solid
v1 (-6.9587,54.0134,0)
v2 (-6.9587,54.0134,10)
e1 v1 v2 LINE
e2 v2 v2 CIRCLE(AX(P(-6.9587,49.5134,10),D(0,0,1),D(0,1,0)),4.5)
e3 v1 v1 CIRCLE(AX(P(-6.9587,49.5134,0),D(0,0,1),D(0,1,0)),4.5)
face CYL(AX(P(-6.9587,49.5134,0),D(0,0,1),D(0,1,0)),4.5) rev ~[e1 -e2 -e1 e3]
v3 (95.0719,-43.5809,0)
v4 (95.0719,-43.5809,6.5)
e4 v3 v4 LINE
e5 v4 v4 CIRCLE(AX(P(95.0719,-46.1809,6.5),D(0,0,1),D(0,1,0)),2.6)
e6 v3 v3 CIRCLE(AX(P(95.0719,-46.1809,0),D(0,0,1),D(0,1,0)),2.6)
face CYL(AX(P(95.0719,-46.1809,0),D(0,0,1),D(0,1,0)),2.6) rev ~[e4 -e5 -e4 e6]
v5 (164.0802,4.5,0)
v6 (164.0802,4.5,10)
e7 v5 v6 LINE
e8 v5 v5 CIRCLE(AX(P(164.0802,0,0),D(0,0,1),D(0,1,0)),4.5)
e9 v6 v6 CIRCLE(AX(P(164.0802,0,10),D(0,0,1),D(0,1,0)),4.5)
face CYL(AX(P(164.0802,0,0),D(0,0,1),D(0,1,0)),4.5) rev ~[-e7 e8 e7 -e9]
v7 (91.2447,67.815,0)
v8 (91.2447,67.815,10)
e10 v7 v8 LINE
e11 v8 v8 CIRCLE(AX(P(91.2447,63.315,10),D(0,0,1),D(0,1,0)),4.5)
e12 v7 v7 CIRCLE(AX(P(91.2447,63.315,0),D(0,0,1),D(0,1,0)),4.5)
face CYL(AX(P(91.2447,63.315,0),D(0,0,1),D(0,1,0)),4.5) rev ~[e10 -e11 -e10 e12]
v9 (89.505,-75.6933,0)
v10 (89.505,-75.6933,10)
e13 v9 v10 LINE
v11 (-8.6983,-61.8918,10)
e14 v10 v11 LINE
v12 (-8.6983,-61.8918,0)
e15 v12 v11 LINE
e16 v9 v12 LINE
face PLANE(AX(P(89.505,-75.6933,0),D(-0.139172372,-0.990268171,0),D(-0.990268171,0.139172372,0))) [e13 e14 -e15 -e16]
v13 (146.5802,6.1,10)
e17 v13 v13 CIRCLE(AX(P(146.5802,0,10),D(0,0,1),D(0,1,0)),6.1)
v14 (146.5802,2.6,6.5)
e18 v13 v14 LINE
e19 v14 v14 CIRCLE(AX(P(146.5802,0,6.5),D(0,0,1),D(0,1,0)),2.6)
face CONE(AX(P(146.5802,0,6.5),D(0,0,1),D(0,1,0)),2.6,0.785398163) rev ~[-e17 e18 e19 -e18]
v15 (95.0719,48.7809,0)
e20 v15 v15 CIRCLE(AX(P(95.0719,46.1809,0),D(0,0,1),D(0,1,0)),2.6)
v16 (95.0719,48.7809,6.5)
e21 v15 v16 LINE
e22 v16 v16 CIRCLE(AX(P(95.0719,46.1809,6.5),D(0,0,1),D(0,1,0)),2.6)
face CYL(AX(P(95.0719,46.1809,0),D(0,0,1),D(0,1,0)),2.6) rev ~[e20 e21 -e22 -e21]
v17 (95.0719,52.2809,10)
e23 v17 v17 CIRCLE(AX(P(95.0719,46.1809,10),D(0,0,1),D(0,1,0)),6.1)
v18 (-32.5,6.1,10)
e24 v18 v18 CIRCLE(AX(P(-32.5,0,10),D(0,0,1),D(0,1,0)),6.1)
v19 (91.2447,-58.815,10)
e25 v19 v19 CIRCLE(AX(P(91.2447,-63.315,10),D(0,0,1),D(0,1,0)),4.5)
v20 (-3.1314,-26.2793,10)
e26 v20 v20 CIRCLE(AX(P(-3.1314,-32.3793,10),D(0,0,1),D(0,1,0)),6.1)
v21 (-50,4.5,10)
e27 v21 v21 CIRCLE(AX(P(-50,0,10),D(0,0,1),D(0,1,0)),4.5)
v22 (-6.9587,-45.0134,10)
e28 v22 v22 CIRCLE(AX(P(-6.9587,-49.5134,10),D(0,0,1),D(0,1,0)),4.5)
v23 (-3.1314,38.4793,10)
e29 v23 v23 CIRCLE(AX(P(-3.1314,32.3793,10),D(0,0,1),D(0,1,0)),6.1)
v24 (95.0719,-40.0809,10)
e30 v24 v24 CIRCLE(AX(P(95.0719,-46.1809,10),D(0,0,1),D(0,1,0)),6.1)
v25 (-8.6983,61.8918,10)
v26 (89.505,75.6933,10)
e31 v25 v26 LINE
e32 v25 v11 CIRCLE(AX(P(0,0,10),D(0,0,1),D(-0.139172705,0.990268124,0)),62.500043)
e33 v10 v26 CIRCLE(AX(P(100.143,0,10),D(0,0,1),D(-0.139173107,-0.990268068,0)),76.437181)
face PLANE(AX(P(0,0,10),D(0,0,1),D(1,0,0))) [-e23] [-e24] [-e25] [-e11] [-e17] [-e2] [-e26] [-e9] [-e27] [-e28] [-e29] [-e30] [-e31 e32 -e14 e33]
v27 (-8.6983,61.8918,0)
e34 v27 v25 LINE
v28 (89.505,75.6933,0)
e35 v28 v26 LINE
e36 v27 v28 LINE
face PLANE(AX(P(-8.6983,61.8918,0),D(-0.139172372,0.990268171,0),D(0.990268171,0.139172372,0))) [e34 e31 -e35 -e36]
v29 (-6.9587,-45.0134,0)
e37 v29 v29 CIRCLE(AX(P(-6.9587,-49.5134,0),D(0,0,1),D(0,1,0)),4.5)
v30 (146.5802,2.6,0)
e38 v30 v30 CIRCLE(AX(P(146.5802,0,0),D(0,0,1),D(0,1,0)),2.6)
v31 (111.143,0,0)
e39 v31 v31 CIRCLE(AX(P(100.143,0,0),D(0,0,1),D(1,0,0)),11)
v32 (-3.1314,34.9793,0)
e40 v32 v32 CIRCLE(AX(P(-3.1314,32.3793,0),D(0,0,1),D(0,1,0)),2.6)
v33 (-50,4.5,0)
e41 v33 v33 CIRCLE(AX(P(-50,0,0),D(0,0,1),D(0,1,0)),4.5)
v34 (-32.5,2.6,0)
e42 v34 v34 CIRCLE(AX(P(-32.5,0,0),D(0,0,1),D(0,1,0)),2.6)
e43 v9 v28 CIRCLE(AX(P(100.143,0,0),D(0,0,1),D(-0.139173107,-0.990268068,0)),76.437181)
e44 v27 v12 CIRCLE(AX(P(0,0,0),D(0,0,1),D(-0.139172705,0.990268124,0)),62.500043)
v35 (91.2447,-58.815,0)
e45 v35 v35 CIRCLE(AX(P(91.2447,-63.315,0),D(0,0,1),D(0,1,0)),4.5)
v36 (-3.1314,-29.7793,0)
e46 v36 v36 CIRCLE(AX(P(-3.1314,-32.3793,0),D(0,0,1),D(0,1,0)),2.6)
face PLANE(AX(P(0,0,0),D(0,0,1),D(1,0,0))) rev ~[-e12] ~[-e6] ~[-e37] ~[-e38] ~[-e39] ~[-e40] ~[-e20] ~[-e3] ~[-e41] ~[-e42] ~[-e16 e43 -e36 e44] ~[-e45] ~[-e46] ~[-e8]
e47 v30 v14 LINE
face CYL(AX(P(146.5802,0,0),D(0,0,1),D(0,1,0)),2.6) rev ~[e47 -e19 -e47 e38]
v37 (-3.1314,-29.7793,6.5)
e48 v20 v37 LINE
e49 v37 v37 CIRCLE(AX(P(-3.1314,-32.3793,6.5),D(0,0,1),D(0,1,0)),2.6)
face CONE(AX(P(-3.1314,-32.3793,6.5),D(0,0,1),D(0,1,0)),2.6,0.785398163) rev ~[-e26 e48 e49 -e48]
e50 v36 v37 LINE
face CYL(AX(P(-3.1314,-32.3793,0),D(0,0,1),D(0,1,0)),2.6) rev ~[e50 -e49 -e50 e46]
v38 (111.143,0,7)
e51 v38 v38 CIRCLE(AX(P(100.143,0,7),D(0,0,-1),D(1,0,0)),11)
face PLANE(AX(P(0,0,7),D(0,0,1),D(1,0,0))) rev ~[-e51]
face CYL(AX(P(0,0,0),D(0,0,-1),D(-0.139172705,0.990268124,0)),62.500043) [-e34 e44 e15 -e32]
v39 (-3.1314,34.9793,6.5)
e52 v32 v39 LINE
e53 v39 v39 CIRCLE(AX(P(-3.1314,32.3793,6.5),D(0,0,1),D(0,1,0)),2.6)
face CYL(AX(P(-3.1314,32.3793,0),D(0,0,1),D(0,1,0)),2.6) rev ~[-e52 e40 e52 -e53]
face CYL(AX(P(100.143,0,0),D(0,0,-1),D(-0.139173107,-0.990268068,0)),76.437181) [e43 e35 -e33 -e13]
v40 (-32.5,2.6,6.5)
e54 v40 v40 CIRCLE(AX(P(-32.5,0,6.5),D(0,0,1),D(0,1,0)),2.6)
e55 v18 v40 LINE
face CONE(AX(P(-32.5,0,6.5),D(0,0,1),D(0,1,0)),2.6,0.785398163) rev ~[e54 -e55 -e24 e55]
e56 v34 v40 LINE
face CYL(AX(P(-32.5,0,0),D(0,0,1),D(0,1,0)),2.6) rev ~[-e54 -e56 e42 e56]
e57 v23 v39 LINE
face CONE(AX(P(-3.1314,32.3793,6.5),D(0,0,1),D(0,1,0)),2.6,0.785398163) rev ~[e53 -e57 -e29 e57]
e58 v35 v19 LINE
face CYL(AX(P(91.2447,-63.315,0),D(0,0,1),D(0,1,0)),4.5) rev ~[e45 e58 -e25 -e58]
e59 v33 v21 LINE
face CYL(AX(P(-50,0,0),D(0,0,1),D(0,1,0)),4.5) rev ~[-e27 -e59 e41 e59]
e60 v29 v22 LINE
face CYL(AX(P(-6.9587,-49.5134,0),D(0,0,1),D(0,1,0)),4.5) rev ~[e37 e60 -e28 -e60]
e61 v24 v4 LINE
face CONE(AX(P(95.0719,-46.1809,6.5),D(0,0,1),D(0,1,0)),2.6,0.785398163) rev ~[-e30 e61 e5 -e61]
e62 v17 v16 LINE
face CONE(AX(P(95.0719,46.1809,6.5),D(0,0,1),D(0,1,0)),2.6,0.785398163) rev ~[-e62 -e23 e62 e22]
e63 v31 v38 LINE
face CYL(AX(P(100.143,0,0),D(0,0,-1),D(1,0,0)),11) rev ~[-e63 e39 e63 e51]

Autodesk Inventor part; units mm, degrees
ref_plane "YZ Plane" through (0, 0, 0) normal (1, 0, 0) x (0, 1, 0)
ref_plane "XZ Plane" through (0, 0, 0) normal (0, 1, 0) x (-1, 0, 0)
ref_plane "XY Plane" through (0, 0, 0) normal (0, 0, 1) x (1, 0, 0)
sketch "Sketch1" plane through (0, 0, 0) normal (0, 0, 1) x (1, 0, 0)
  arc A0 (-5.9149, 42.0864) -> (-5.9149, -42.0864) centre (0, 0) ccw
  arc A1 (92.2885, -55.888) -> (92.2885, 55.888) centre (100.143, 0) ccw
  line L0 (-42.5, 0) -> (156.5802, 0)
  line L1 (92.2885, 55.888) -> (-5.9149, 42.0864)
  line L2 (-5.9149, -42.0864) -> (92.2885, -55.888)
  line L3 (-3.1314, 22.281) -> (95.0719, 36.0826)
  arc A2 (95.0719, -36.0826) -> (95.0719, 36.0826) centre (100.143, 0) ccw
  line L4 (95.0719, -36.0826) -> (-3.1314, -22.281)
  arc A3 (-3.1314, 22.281) -> (-3.1314, -22.281) centre (0, 0) ccw
  circle A4 centre (100.143, 0) radius 11
  line L5 (89.505, -75.6933) -> (-8.6983, -61.8918)
  arc A5 (-8.6983, 61.8918) -> (-8.6983, -61.8918) centre (0, 0) ccw
  line L6 (-8.6983, 61.8918) -> (89.505, 75.6933)
  arc A6 (89.505, -75.6933) -> (89.505, 75.6933) centre (100.143, 0) ccw
  point P0 (146.5802, 0)
  point P1 (95.0719, 46.1809)
  point P2 (95.0719, -46.1809)
  point P3 (-32.5, 0)
  point P4 (-3.1314, 32.3793)
  point P5 (-3.1314, -32.3793)
  dimension "d0" = 85
  dimension "d1" = 100.143
  dimension "d2" = 8
  dimension "d3" = 20
  dimension "d4" = 10
  dimension "d5" = 10
  dimension "d6" = 10
  dimension "d7" = 10
  dimension "d8" = 10
  dimension "d9" = 10
  dimension "d22" = 22
  dimension "d26" = 20
extrude "Extrusion1" add sketch "Sketch1" along normal blind 10 contours L1 A1 L0 A2 L3 A3 A0 | L0 A3 L4 A2 A1 L2 A0 | A3 L3 A2 L0 A4 | L0 A4 A2 L4 A3 | L5 A5 L6 A6
sketch "Sketch4" plane through (0, 0, 10) normal (0, 0, 1) x (1, 0, 0)
  circle A0 centre (100.143, 0) radius 11.5 projected
  point P0 (0, 0)
extrude "Extrusion4" add sketch "Sketch4" against normal blind 3
hole "Hole3" at (146.5802, 0, 0) at (95.0719, 46.1809, 0) at (95.0719, -46.1809, 0) at (-32.5, 0, 0) at (-3.1314, 32.3793, 0) at (-3.1314, -32.3793, 0) direction (0, 0, 1) diameter 5.2 end through all
sketch "Sketch8" plane through (0, 0, 0) normal (0, 0, -1) x (-1, 0, 0)
  circle A0 centre (6.9587, -49.5134) radius 4.5
  circle A1 centre (-164.0802, 0) radius 4.5
  circle A2 centre (6.9587, 49.5134) radius 4.5
  circle A3 centre (-91.2447, 63.315) radius 4.5
  circle A4 centre (-91.2447, -63.315) radius 4.5
  circle A5 centre (50, 0) radius 4.5
  line L0 (8.6983, -61.8918) -> (-89.505, -75.6933)
  arc A6 (8.6983, -61.8918) -> (8.6983, 61.8918) centre (0, 0) ccw
  line L1 (-89.505, 75.6933) -> (8.6983, 61.8918)
  arc A7 (-89.505, 75.6933) -> (-89.505, -75.6933) centre (-100.143, 0) ccw
  circle A8 centre (32.5, 0) radius 2.067
  circle A9 centre (3.1314, 32.3793) radius 2.067
  circle A10 centre (-95.0719, 46.1809) radius 2.067
  circle A11 centre (-146.5802, 0) radius 2.067
  arc A12 (-94.3761, 41.0339) -> (-94.3761, -41.0339) centre (-100.143, 0) ccw
  line L2 (3.8273, 27.2324) -> (-94.3761, 41.0339)
  arc A13 (3.8273, -27.2324) -> (3.8273, 27.2324) centre (0, 0) ccw
  line L3 (-94.3761, -41.0339) -> (3.8273, -27.2324)
  circle A14 centre (-95.0719, -46.1809) radius 2.067
  circle A15 centre (3.1314, -32.3793) radius 2.067
  circle A16 centre (3.1314, 32.3793) radius 2.6 projected
  circle A17 centre (-95.0719, -46.1809) radius 2.6 projected
  circle A18 centre (-146.5802, 0) radius 2.6 projected
  circle A19 centre (-95.0719, 46.1809) radius 2.6 projected
  circle A20 centre (32.5, 0) radius 2.6 projected
  circle A21 centre (3.1314, -32.3793) radius 2.6 projected
  line L4 (-89.505, 75.6933) -> (8.6983, 61.8918) projected
  arc A22 (-89.505, 75.6933) -> (-89.505, -75.6933) centre (-100.143, 0) ccw projected
  line L5 (8.6983, -61.8918) -> (-89.505, -75.6933) projected
  arc A23 (8.6983, -61.8918) -> (8.6983, 61.8918) centre (0, 0) ccw projected
hole "Hole6" at (164.0802, 0, 0) at (91.2447, -63.315, 0) at (-6.9587, -49.5134, 0) at (-50, 0, 0) at (-6.9587, 49.5134, 0) at (91.2447, 63.315, 0) direction (0, 0, 1) diameter 9 depth 40 tip angle 118 clearance for "Hex Head Cap Screw ISO 24017" size "M8" standard "ISO"
chamfer "Chamfer6" distance 3.5 angle 45 6 edges at (95.0719, 43.5809, 10) (146.5802, -2.6, 10) (95.0719, -48.7809, 10) (-3.1314, -34.9793, 10) (-32.5, -2.6, 10) (-3.1314, 29.7793, 10)
equation "\"d4\" = d7"
equation "\"d5\" = d8"
equation "\"d6\" = d7"
equation "\"d8\" = d7"
equation "\"d9\" = d4"
properties part number "onderkantBasegefreesd" material "Aluminum 6061"
